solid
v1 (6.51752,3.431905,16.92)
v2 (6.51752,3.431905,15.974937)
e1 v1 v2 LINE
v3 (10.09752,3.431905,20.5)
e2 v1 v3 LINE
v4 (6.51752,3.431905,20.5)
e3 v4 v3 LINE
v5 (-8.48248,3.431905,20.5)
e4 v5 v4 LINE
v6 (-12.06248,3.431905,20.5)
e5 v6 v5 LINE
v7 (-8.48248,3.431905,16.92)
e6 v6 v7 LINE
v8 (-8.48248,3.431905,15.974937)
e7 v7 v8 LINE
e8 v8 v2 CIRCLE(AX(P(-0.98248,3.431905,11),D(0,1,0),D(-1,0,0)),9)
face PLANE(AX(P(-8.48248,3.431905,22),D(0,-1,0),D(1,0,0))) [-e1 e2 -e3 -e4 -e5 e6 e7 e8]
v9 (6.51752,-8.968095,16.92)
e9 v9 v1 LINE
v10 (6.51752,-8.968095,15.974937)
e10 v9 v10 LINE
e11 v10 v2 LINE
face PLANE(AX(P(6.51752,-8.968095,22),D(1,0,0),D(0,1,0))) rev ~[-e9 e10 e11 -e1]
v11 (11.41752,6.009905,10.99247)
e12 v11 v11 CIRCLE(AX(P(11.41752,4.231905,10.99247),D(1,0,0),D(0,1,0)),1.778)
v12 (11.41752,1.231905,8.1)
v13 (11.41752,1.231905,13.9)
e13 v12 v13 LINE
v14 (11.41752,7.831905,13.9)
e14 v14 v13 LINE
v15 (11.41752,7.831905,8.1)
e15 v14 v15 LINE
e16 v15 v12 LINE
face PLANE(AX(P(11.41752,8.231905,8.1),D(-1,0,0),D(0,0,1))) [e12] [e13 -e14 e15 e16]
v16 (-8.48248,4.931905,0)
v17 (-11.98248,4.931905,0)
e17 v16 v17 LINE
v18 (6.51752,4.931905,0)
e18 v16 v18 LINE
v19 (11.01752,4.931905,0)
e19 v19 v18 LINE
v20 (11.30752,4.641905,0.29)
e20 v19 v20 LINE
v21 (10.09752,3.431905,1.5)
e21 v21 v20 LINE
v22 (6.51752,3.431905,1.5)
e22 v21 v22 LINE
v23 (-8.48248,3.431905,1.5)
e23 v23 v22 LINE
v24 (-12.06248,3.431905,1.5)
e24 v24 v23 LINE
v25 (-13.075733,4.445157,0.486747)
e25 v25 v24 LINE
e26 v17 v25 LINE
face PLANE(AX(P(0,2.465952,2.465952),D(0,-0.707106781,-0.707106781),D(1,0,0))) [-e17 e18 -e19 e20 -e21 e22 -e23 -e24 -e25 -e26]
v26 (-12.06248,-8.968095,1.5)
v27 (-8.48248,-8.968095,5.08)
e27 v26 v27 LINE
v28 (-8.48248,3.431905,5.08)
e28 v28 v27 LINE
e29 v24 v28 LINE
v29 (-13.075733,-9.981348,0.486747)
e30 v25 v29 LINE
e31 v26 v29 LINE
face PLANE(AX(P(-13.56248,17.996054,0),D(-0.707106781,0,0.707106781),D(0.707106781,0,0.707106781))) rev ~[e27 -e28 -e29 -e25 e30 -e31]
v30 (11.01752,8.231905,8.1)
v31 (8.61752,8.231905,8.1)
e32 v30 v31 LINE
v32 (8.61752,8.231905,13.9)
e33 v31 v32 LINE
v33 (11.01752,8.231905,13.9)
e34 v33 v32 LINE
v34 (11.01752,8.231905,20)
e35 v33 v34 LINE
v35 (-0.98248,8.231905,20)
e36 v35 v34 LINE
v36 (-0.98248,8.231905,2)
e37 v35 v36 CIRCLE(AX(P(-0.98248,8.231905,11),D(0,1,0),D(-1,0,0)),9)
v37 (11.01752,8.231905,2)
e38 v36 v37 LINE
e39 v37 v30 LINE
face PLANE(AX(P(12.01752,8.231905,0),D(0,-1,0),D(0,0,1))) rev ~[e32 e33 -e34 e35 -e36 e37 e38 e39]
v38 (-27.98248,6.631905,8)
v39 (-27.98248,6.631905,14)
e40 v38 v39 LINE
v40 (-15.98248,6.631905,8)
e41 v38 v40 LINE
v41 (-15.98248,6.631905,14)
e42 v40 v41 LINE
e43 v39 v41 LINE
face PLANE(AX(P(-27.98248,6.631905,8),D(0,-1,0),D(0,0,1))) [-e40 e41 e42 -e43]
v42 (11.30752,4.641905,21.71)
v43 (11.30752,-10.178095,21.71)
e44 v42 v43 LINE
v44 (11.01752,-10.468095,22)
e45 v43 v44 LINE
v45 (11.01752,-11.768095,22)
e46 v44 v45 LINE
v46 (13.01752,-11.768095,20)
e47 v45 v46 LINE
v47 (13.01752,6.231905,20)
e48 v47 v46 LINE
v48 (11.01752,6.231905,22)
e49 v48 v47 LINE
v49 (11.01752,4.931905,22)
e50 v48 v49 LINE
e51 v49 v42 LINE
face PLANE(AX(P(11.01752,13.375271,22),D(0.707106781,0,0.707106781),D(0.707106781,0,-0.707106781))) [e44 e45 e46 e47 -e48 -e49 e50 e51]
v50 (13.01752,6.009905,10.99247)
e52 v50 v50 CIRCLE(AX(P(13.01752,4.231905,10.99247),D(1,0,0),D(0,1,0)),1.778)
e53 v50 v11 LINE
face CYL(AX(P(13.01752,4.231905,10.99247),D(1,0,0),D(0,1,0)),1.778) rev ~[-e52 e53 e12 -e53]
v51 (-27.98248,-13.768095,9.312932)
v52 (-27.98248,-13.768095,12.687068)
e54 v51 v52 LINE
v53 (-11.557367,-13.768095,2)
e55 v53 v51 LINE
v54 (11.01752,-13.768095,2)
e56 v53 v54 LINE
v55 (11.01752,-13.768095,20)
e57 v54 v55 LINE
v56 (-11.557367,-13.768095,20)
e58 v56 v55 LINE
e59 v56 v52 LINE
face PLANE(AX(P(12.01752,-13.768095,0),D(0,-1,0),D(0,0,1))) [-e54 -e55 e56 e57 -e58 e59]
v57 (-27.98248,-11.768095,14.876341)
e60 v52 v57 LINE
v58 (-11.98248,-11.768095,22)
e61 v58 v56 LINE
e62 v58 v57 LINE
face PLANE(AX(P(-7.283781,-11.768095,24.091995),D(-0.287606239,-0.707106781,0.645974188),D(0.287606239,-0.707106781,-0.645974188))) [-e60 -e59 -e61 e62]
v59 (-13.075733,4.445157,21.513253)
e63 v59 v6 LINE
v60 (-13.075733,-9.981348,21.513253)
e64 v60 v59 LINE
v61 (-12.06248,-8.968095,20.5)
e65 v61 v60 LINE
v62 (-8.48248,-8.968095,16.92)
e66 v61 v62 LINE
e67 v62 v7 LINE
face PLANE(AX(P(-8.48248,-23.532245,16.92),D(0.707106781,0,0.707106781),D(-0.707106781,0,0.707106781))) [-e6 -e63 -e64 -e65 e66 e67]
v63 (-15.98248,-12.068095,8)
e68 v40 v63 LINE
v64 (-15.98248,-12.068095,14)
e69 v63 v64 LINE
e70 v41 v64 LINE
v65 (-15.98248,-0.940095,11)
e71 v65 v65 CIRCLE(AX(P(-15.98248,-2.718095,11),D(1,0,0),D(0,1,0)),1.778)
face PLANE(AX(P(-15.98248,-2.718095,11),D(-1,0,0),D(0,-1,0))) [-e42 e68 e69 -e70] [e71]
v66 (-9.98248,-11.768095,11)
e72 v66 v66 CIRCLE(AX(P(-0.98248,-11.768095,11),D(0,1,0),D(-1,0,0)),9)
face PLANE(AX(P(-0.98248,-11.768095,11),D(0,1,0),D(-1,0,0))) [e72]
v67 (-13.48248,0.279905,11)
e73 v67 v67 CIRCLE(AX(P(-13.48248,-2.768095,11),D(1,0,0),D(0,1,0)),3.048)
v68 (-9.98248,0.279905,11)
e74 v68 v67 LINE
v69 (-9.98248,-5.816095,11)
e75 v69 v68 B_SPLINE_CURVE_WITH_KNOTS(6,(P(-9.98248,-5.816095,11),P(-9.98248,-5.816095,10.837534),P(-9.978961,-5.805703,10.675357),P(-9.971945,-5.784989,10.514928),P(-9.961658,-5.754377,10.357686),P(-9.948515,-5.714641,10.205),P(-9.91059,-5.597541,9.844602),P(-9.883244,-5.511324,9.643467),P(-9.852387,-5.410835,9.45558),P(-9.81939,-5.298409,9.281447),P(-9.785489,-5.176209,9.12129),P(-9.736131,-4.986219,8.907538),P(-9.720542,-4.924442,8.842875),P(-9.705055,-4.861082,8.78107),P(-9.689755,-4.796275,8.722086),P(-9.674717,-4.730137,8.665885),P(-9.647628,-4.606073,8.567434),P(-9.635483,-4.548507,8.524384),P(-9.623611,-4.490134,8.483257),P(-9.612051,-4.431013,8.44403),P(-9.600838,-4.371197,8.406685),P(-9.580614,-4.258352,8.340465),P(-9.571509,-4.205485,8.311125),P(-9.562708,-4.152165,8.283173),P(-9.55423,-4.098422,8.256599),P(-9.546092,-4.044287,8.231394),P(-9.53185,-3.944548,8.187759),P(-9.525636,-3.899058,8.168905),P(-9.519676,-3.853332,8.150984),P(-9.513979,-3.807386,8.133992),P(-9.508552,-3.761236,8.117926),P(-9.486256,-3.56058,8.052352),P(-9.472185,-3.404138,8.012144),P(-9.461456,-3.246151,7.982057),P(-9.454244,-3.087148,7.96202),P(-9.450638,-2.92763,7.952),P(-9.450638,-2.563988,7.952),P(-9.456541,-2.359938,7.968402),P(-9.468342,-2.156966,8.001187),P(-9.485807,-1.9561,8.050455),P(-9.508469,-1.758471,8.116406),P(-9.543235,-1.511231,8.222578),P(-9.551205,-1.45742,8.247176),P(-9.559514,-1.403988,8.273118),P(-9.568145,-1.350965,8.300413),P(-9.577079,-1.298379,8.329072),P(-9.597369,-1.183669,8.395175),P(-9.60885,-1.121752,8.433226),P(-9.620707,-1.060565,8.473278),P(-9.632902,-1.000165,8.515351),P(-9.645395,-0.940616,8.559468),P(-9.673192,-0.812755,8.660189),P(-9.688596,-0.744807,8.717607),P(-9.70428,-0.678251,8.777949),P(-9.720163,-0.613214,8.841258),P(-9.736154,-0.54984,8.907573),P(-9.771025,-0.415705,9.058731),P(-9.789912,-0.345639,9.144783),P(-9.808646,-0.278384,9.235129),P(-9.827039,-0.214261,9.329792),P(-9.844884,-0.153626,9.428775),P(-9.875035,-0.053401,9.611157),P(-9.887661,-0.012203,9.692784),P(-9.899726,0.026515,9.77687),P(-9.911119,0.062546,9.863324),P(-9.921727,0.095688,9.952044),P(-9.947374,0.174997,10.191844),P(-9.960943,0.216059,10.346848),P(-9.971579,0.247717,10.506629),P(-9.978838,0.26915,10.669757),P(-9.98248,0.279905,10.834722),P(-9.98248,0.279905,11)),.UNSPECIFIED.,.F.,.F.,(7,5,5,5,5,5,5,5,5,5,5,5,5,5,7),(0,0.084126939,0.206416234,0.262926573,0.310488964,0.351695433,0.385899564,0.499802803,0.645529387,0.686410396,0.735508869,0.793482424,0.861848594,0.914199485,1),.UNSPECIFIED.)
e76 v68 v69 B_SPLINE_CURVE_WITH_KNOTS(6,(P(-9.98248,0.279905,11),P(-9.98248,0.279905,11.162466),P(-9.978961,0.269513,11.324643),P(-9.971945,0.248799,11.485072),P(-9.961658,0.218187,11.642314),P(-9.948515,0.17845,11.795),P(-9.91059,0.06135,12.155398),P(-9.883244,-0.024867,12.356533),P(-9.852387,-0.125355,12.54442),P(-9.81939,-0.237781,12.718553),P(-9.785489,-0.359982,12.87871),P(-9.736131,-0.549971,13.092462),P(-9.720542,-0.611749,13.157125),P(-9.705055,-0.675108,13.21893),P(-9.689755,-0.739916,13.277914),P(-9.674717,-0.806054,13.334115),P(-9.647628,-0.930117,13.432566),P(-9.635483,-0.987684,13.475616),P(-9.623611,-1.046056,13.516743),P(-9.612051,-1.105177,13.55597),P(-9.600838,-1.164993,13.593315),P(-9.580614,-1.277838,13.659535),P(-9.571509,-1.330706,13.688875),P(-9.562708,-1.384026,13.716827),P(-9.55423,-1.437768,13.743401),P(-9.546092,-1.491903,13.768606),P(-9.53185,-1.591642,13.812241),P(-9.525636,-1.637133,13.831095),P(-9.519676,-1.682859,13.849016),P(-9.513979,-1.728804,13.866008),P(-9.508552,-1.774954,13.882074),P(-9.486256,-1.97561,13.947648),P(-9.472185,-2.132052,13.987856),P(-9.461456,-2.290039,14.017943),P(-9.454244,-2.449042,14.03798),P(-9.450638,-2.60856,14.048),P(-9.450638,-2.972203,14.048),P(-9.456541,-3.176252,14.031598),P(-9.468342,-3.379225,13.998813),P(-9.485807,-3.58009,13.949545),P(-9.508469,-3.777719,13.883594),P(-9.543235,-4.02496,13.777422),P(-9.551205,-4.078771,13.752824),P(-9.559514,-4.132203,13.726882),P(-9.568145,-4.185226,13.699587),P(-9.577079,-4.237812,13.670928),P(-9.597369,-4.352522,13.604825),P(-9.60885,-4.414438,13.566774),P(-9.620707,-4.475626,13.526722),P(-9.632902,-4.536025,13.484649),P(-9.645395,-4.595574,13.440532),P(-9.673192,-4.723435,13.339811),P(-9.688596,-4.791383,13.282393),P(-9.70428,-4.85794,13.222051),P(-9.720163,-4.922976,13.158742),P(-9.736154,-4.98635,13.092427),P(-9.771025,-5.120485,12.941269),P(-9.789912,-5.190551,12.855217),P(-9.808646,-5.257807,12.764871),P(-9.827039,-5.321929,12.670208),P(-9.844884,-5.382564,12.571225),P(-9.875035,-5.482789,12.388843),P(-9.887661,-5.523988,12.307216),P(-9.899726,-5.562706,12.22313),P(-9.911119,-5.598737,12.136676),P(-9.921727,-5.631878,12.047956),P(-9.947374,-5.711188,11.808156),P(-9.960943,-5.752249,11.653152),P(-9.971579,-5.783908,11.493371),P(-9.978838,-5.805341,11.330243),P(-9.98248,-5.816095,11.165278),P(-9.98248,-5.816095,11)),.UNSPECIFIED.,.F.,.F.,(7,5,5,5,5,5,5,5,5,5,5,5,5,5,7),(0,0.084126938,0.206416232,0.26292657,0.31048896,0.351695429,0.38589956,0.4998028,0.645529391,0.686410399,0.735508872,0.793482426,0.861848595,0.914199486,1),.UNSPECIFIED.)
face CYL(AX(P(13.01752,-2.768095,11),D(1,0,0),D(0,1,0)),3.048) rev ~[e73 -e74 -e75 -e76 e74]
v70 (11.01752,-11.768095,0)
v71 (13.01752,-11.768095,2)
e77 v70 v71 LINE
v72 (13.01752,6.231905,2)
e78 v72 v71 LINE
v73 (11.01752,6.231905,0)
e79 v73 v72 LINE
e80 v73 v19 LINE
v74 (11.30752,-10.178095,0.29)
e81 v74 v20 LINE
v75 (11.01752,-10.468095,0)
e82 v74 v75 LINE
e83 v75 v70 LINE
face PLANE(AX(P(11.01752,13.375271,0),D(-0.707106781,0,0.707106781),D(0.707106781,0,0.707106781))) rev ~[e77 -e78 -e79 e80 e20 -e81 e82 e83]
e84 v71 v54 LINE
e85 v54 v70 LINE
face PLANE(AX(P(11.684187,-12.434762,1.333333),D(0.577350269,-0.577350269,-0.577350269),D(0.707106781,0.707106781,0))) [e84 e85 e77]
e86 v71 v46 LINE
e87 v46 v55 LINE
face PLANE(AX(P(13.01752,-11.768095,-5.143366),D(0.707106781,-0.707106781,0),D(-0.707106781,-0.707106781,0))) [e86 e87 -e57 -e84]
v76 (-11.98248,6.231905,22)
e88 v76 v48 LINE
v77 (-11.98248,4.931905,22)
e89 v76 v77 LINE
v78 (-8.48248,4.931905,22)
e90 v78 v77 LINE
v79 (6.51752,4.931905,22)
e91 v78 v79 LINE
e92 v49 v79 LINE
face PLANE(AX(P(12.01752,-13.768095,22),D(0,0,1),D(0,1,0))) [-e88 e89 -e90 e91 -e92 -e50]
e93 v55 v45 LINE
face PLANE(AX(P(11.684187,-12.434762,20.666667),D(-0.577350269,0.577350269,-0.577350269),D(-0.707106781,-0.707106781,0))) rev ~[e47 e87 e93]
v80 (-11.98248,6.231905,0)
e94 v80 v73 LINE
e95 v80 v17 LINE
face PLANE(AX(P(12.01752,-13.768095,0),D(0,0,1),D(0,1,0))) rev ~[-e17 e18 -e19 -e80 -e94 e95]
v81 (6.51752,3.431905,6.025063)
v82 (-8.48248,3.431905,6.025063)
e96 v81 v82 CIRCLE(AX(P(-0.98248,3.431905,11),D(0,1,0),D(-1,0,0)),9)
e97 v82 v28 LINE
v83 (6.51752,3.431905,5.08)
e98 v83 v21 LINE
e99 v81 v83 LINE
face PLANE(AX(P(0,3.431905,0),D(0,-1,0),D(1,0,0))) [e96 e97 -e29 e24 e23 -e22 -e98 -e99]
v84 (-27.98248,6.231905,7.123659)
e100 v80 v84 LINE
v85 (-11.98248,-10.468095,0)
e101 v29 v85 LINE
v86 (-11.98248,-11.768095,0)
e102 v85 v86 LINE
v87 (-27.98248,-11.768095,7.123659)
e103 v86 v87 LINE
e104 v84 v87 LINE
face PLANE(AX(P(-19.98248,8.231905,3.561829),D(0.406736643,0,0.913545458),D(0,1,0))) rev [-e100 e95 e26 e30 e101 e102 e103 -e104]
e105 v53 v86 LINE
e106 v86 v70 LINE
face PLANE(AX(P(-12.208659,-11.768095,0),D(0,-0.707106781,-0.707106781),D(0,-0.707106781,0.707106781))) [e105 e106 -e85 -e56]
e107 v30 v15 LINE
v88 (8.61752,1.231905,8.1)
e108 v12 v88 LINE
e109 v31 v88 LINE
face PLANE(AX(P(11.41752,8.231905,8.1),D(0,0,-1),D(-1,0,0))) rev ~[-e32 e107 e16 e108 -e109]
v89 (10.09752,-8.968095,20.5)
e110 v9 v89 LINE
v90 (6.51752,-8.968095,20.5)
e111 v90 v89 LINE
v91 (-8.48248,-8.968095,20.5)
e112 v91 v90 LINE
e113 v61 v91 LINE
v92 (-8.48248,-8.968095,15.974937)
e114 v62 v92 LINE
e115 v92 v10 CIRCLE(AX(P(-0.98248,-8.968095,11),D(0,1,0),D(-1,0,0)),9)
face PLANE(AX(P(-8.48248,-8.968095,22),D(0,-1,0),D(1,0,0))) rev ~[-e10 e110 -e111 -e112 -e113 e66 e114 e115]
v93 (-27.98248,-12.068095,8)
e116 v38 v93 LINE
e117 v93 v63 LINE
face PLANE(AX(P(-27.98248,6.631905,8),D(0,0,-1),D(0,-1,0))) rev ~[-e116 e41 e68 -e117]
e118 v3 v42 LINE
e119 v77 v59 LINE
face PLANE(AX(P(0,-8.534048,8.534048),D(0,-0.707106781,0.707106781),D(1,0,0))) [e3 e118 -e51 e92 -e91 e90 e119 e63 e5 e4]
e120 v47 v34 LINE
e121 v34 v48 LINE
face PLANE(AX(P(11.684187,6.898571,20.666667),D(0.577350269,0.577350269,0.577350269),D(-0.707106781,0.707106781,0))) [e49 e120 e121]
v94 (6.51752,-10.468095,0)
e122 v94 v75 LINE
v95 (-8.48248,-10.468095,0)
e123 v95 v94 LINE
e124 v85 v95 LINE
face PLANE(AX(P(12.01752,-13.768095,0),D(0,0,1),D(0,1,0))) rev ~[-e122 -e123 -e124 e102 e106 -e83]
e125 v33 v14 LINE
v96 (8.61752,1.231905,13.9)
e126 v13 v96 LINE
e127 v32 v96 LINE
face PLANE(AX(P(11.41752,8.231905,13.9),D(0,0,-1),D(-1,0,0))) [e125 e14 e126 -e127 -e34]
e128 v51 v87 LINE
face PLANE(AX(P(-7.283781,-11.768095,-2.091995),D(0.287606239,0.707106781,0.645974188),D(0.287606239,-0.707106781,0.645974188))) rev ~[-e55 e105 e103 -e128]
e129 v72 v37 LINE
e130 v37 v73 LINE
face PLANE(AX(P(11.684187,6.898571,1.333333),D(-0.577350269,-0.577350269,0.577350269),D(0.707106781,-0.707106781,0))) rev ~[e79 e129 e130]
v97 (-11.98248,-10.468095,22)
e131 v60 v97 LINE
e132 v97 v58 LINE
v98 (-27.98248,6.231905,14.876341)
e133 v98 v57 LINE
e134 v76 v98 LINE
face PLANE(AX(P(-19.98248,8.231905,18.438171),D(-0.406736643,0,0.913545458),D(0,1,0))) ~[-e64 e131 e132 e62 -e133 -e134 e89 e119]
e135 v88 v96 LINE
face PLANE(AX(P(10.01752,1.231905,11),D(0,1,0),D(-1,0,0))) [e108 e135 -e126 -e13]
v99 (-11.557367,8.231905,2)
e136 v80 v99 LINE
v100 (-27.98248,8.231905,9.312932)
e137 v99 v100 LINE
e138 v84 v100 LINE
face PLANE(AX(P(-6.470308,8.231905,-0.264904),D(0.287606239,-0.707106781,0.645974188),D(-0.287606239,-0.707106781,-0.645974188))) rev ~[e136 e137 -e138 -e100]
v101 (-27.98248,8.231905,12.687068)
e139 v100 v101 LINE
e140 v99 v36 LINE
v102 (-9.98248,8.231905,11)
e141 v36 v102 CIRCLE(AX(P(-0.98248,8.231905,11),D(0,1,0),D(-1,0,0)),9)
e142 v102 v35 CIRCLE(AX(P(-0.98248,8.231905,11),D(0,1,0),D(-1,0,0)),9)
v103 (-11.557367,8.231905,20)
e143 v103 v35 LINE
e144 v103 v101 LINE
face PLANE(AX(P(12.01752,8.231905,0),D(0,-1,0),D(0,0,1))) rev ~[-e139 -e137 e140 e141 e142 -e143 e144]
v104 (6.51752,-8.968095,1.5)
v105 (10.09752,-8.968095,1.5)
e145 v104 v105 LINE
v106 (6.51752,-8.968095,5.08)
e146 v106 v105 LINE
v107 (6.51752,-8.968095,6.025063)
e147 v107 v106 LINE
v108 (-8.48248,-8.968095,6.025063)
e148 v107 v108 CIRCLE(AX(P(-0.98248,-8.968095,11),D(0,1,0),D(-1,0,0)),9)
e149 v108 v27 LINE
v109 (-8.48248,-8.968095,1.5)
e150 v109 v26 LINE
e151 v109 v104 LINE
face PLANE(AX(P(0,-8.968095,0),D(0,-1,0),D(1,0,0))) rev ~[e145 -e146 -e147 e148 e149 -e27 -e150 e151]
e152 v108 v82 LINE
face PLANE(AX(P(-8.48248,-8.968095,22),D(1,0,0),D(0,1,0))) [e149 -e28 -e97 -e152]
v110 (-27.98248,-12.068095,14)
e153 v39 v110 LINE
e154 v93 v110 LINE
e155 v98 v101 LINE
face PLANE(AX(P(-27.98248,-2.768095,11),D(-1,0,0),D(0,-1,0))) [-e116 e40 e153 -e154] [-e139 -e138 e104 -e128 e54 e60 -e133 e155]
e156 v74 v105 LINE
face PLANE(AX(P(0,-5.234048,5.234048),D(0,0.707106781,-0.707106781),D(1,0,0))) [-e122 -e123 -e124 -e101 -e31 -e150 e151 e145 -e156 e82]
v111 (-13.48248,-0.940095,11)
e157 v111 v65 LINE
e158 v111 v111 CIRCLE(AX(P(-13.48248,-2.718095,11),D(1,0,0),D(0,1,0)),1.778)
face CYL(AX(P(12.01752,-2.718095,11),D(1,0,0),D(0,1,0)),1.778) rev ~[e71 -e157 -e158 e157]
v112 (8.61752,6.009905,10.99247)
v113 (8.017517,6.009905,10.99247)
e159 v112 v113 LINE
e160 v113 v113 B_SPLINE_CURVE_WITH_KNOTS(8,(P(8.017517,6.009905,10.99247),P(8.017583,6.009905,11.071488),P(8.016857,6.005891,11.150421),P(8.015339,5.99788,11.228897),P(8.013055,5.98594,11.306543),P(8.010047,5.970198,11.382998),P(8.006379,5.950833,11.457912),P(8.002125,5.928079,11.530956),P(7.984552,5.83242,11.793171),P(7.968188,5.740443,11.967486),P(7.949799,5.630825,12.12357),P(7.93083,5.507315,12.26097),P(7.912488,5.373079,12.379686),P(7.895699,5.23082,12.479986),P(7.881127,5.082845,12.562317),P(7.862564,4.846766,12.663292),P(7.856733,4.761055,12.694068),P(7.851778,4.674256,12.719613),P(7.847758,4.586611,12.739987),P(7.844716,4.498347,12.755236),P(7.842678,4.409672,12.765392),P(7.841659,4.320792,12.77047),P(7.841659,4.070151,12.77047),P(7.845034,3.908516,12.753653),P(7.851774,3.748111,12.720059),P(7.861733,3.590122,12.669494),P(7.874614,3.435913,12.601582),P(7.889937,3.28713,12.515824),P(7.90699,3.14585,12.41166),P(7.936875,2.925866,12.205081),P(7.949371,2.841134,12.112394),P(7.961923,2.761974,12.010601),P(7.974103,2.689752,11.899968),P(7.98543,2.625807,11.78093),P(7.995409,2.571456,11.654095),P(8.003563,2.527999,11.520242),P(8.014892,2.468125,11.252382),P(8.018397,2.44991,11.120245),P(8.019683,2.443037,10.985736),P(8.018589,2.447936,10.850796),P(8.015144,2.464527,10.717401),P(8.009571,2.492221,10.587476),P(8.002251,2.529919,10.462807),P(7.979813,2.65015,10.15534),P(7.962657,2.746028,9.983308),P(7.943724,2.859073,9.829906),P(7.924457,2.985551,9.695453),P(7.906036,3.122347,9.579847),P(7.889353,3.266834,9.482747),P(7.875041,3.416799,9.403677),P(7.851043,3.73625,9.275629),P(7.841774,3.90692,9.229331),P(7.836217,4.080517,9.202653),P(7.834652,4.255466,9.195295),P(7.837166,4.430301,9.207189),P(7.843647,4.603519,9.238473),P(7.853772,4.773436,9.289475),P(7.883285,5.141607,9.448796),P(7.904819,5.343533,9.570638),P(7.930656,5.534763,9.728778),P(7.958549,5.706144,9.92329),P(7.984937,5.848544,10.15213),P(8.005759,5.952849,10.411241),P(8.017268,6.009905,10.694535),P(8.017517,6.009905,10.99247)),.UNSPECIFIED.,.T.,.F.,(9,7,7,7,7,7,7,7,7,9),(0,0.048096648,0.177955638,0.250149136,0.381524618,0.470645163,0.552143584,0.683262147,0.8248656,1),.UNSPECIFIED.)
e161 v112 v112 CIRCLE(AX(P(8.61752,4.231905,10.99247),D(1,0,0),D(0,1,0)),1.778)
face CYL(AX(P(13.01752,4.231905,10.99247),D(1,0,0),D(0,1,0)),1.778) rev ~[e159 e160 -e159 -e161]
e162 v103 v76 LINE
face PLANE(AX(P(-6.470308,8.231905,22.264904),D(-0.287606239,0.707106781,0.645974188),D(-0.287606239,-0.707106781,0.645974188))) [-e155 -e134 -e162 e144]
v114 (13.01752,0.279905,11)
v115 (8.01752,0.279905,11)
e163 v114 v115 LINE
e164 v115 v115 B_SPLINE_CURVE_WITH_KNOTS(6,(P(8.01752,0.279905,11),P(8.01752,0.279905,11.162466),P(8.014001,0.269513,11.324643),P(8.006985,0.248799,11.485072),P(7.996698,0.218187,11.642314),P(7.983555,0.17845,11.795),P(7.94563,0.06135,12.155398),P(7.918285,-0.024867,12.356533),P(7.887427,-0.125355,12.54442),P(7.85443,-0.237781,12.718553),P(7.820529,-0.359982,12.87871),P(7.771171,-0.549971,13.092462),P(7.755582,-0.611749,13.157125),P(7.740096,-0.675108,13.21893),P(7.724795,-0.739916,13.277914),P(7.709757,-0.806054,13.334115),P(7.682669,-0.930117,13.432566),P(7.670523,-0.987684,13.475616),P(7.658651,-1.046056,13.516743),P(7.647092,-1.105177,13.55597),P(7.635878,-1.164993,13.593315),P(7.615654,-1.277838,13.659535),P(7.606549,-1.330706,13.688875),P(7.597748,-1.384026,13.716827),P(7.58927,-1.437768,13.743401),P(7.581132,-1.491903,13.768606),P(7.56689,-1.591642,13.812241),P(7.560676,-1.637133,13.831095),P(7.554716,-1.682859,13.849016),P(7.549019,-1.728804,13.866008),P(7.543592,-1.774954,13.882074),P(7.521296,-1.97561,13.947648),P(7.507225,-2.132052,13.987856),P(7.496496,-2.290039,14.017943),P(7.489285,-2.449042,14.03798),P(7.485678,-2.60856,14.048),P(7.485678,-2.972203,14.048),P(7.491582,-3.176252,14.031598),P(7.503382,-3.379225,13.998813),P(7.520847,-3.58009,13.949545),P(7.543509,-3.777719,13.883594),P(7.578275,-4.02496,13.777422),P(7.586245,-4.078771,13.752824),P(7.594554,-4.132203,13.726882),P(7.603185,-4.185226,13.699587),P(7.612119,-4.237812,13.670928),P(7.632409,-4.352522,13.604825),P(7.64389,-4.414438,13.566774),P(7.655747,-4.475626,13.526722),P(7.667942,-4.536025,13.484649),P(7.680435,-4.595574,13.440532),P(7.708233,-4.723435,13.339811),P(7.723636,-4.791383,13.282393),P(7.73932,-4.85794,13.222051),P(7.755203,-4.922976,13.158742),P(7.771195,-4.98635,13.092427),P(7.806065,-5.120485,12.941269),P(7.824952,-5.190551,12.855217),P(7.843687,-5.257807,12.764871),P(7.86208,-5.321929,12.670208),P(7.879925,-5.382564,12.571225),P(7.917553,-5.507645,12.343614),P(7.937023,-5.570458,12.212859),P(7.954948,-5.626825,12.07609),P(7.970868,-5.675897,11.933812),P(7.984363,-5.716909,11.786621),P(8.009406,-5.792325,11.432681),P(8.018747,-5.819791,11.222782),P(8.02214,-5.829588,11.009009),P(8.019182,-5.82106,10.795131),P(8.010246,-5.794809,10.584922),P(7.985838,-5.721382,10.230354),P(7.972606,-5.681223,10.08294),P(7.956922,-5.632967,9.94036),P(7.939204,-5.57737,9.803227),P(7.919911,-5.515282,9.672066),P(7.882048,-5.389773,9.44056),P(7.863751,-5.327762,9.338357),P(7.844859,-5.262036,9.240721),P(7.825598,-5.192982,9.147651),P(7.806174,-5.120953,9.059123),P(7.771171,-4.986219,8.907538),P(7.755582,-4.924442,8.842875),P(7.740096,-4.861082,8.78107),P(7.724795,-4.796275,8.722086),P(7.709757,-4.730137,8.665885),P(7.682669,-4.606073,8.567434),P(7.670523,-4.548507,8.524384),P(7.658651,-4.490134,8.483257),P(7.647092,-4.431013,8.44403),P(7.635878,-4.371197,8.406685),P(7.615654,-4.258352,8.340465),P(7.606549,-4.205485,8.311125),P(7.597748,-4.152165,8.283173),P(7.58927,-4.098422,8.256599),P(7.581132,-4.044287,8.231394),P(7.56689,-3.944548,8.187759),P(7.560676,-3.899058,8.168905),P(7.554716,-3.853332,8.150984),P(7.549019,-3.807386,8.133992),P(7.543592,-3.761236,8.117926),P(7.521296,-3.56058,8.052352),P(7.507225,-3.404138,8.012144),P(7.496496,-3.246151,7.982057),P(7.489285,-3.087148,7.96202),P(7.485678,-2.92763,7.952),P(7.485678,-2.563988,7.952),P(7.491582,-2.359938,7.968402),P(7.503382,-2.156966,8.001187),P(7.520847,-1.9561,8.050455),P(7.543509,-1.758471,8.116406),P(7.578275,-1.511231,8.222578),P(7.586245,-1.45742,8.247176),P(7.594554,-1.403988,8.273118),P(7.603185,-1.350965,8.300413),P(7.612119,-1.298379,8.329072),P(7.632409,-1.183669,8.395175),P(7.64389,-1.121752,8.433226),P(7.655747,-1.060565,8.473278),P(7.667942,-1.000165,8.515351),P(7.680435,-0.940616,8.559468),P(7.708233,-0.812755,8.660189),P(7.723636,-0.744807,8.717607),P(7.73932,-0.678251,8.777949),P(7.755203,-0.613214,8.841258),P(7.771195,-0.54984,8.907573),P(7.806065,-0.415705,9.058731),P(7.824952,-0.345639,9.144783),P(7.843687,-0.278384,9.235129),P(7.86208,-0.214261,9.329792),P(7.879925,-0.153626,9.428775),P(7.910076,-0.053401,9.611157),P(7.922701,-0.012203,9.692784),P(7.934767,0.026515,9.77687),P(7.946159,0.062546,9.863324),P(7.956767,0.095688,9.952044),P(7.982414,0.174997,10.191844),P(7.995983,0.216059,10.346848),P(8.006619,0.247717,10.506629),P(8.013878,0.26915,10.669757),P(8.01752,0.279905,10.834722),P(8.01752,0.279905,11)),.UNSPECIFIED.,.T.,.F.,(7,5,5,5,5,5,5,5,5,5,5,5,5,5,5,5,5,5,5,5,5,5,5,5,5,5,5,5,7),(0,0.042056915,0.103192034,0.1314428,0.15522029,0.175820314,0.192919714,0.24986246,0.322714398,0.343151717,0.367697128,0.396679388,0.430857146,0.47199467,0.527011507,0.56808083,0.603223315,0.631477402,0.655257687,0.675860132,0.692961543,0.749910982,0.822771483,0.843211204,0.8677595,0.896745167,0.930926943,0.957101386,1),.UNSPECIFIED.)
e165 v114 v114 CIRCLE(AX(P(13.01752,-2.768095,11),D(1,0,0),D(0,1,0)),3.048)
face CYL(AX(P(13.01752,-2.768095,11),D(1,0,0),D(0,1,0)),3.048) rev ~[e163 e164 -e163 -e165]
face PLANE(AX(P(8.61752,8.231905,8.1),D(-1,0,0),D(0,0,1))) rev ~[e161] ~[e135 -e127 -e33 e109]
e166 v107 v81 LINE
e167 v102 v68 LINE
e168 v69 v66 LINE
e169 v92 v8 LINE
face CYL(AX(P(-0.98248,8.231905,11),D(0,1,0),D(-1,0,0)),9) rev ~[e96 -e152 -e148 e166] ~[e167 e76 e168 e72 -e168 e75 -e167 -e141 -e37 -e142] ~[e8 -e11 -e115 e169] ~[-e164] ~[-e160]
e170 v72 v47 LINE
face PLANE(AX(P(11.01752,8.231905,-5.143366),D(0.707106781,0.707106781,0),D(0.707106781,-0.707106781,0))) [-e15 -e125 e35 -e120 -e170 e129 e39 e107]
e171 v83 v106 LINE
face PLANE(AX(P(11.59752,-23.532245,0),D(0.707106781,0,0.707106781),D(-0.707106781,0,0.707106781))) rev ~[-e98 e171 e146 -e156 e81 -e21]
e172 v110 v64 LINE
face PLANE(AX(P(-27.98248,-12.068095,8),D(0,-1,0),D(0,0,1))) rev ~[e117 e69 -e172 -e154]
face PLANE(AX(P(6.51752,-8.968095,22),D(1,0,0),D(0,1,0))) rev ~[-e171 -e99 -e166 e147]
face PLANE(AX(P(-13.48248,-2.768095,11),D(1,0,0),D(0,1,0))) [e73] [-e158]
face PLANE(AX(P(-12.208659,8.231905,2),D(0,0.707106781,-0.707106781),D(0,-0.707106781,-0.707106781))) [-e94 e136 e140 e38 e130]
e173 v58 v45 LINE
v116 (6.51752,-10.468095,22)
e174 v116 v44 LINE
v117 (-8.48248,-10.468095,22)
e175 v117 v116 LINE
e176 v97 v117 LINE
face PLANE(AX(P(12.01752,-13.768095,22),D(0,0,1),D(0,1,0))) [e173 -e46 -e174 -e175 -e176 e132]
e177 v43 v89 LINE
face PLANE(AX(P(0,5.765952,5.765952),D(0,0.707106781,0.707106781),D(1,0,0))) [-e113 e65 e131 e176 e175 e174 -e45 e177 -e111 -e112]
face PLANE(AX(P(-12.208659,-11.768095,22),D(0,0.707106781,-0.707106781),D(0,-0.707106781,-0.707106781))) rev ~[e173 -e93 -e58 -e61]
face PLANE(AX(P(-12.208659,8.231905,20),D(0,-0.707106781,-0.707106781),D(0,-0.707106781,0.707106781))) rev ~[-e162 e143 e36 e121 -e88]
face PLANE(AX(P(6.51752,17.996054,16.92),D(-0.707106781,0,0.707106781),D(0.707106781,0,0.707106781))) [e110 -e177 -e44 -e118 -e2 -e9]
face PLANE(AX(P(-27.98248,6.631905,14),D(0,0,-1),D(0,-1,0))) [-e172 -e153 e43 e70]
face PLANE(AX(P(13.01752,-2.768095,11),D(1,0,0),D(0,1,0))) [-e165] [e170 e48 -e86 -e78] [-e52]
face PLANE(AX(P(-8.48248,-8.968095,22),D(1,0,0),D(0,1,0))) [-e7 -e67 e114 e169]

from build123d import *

# Parameters (mm, degrees)
F0_W          = 26
F0_H          = 22
F1_DEPTH      = 22
F2_R          = 9
F3_DEPTH      = 20
F4_W          = 15
F4_H          = 12.4
F5_DEPTH      = 22.001
F6_W          = 22
F6_H          = 22
F7_DEPTH      = 14
F8_W          = 18.7
F8_H          = 6
F9_DEPTH      = 12
F10_R         = 1.778
F11_DEPTH     = 40.001
F12_SIZE      = 1.5
F13_SIZE2     = 7.1236589649
F13_SIZE      = 16
F13_2_SIZE2   = 7.1236589649
F13_2_SIZE    = 16
F14_T1_DEPTH  = 27.800912408
F14_T3_DEPTH  = 27.800912408
F15_W         = 2.8
F15_H         = 5.8
F16_DEPTH     = 7
F17_W         = 22
F17_H         = 22
F18_DEPTH     = 1
F19_R         = 3.048
F20_DEPTH     = 26.5
F21_R         = 1.778
F22_DEPTH     = 6
F23_T1_DEPTH  = 2.5403411844
F23_T3_DEPTH  = 2.5403411844
F23_T5_DEPTH  = 2.5403411844
F23_T7_DEPTH  = 2.5403411844
F23_T9_DEPTH  = 32.2867319519
F23_T11_DEPTH = 32.2867319519
F23_T13_DEPTH = 30.3695452806
F24_T4_DEPTH  = 41.5282991577
F24_T10_DEPTH = 41.5282991577
F24_T16_DEPTH = 41.5282991577
F24_T22_DEPTH = 41.5282991577
F24_T28_DEPTH = 41.5282991577
F24_T34_DEPTH = 41.5282991577
F24_T40_DEPTH = 41.5282991577
F24_T46_DEPTH = 41.5282991577


# Not quite as in the source:
# - a fillet or chamfer that OpenCascade refuses, or shapes differently, is made with other operations: its cross-section is extruded or revolved along the edge and cut away or added


with BuildPart() as f1:
    # F0 (on Top) → F1 (new body)
    with BuildSketch(Plane.XY):
        with Locations((-0.9824799188, -2.7680952549)):
            Rectangle(F0_W, F0_H)
    extrude(amount=F1_DEPTH)

    # F2 (on face) → F3 (cut)
    with BuildSketch(Plane(origin=(0, 8.2319047451, 0), x_dir=(-1, 0, 0), z_dir=(0, 1, 0))):
        with Locations((0.9824799188, 11)):
            Circle(F2_R)
    extrude(amount=-F3_DEPTH, mode=Mode.SUBTRACT)

    # F4 (on face) → F5 (cut, through all)
    with BuildSketch(Plane.XY.offset(22)):
        with Locations((-0.9824799188, -2.7680952549)):
            Rectangle(F4_W, F4_H)
    extrude(amount=-F5_DEPTH, mode=Mode.SUBTRACT)

    # F6 (on face) → F7 (join)
    with BuildSketch(Plane(origin=(-13.9824799188, 0, 0), x_dir=(0, -1, 0), z_dir=(-1, 0, 0))):
        with Locations((2.7680952549, 11)):
            Rectangle(F6_W, F6_H)
    extrude(amount=F7_DEPTH)

    # F8 (on face) → F9 (cut)
    with BuildSketch(Plane(origin=(-27.9824799188, 0, 0), x_dir=(0, -1, 0), z_dir=(-1, 0, 0))):
        with Locations((2.7180952549, 11)):
            Rectangle(F8_W, F8_H)
    extrude(amount=-F9_DEPTH, mode=Mode.SUBTRACT)

    # F10 (on face) → F11 (cut, through all)
    with BuildSketch(Plane.YZ.offset(12.0175200812)):
        with Locations((-2.7180952549, 11)):
            Circle(F10_R)
    extrude(amount=-F11_DEPTH, mode=Mode.SUBTRACT)

    # F12
    f12_edges = [f1.edges().sort_by_distance(p)[0] for p in [
        (-0.98248, 3.431905, 22),
        (-0.98248, -8.968095, 22),
        (-0.98248, 3.431905, 0),
        (-0.98248, -8.968095, 0),
    ]]
    chamfer(f12_edges, length=F12_SIZE)

    # F13
    f13_edges = [f1.edges().sort_by_distance(p)[0] for p in [
        (-27.98248, -2.768095, 22),
    ]]
    f13_side = f1.faces().sort_by_distance((-10.474005, -2.768095, 22))[0]
    chamfer(f13_edges, length=F13_SIZE, length2=F13_SIZE2, reference=f13_side)

    # F13#2
    f13_2_edges = [f1.edges().sort_by_distance(p)[0] for p in [
        (-27.98248, -2.768095, 0),
    ]]
    f13_2_side = f1.faces().sort_by_distance((-10.474005, -2.768095, 0))[0]
    chamfer(f13_2_edges, length=F13_2_SIZE, length2=F13_2_SIZE2, reference=f13_2_side)

    # F14: chamfer of 2 on 4 edges, made by hand

    # F14_s2 → F14_t1 (cut)
    with BuildSketch(Plane(origin=(2.8731297183, 0, 1.2791997672), x_dir=(0, 1, 0), z_dir=(-0.9135454576, 0, -0.4067366431))):
        Polygon((8.2319047451, -22.971713726), (6.2319047451, -24.971713726), (8.2319047451, -24.971713726), align=None)
        Polygon((-11.7680952549, -24.971713726), (-13.7680952549, -22.971713726), (-13.7680952549, -24.971713726), align=None)
    extrude(amount=F14_T1_DEPTH, mode=Mode.SUBTRACT)

    # F14_s4 → F14_t3 (cut)
    with BuildSketch(Plane(origin=(-5.301463362, 0, 2.3603635629), x_dir=(0, 1, 0), z_dir=(-0.9135454576, 0, 0.4067366431))):
        Polygon((8.2319047451, 2.8737136579), (6.2319047451, 4.8737136579), (8.2319047451, 4.8737136579), align=None)
        Polygon((-11.7680952549, 4.8737136579), (-13.7680952549, 2.8737136579), (-13.7680952549, 4.8737136579), align=None)
    extrude(amount=F14_T3_DEPTH, mode=Mode.SUBTRACT)

    # F15 (on face) → F16 (cut)
    with BuildSketch(Plane(origin=(0, 8.2319047451, 0), x_dir=(-1, 0, 0), z_dir=(0, 1, 0))):
        with Locations((-10.0175200812, 11)):
            Rectangle(F15_W, F15_H)
    extrude(amount=-F16_DEPTH, mode=Mode.SUBTRACT)

    # F17 (on face) → F18 (join)
    with BuildSketch(Plane.YZ.offset(12.0175200812)):
        with Locations((-2.7680952549, 11)):
            Rectangle(F17_W, F17_H)
    extrude(amount=F18_DEPTH)

    # F19 (on face) → F20 (cut)
    with BuildSketch(Plane.YZ.offset(13.0175200812)):
        with Locations((-2.7680952549, 11)):
            Circle(F19_R)
    extrude(amount=-F20_DEPTH, mode=Mode.SUBTRACT)

    # F21 (on face) → F22 (cut)
    with BuildSketch(Plane.YZ.offset(13.0175200812)):
        with Locations((4.2319047451, 10.9924701974)):
            Circle(F21_R)
    extrude(amount=-F22_DEPTH, mode=Mode.SUBTRACT)

    # F23: chamfer of 2 on 8 edges, made by hand

    # F23_s2 → F23_t1 (cut)
    with BuildSketch(Plane(origin=(7.595205112, -7.595205112, -7.595205112), x_dir=(0.7071067812, 0.7071067812, 0), z_dir=(0.5773502692, -0.5773502692, -0.5773502692))):
        Polygon((-0.5307367951, 9.3021885081), (0.8834767672, 11.7516782509), (-1.9449503575, 11.7516782509), align=None)
    extrude(amount=F23_T1_DEPTH, mode=Mode.SUBTRACT)

    # F23_s4 → F23_t3 (cut)
    with BuildSketch(Plane(origin=(5.7498082754, 5.7498082754, -5.7498082754), x_dir=(-0.7071067812, 0.7071067812, 0), z_dir=(0.5773502692, 0.5773502692, -0.5773502692))):
        Polygon((-1.9697274939, 9.4915379396), (-3.3839410563, 7.0420481968), (-4.7981546187, 9.4915379396), align=None)
    extrude(amount=F23_T3_DEPTH, mode=Mode.SUBTRACT)

    # F23_s6 → F23_t5 (cut)
    with BuildSketch(Plane(origin=(13.0831416088, 13.0831416088, 13.0831416088), x_dir=(-0.7071067812, 0.7071067812, 0), z_dir=(0.5773502692, 0.5773502692, 0.5773502692))):
        Polygon((-1.9697274939, 8.4713868408), (-3.3839410563, 10.9208765836), (-4.7981546187, 8.4713868408), align=None)
    extrude(amount=F23_T5_DEPTH, mode=Mode.SUBTRACT)

    # F23_s8 → F23_t7 (cut)
    with BuildSketch(Plane(origin=(14.9285384454, -14.9285384454, 14.9285384454), x_dir=(0.7071067812, 0.7071067812, 0), z_dir=(0.5773502692, -0.5773502692, 0.5773502692))):
        Polygon((-0.5307367951, 8.6607362723), (0.8834767672, 6.2112465295), (-1.9449503575, 6.2112465295), align=None)
    extrude(amount=F23_T7_DEPTH, mode=Mode.SUBTRACT)

    # F23_s10 → F23_t9 (cut)
    with BuildSketch(Plane.XZ.offset(-13.375270721)):
        Polygon((11.0175200812, 0), (13.0175200812, 2), (13.0175200812, 0), align=None)
        Polygon((11.0175200812, 22), (13.0175200812, 20), (13.0175200812, 22), align=None)
    extrude(amount=F23_T9_DEPTH, mode=Mode.SUBTRACT)

    # F23_s12 → F23_t11 (cut)
    with BuildSketch(Plane.XY.offset(-5.1433659759)):
        Polygon((11.0175200812, 8.2319047451), (13.0175200812, 6.2319047451), (13.0175200812, 8.2319047451), align=None)
        Polygon((13.0175200812, -11.7680952549), (11.0175200812, -13.7680952549), (13.0175200812, -13.7680952549), align=None)
    extrude(amount=F23_T11_DEPTH, mode=Mode.SUBTRACT)

    # F23_s14 → F23_t13 (cut)
    with BuildSketch(Plane.YZ.offset(-12.2086592235)):
        Polygon((8.2319047451, 20), (6.2319047451, 22), (8.2319047451, 22), align=None)
        Polygon((-11.7680952549, 22), (-13.7680952549, 20), (-13.7680952549, 22), align=None)
        Polygon((-11.7680952549, 0), (-13.7680952549, 2), (-13.7680952549, 0), align=None)
        Polygon((8.2319047451, 2), (6.2319047451, 0), (8.2319047451, 0), align=None)
    extrude(amount=F23_T13_DEPTH, mode=Mode.SUBTRACT)

    # F24: chamfer of 5.08 on 4 edges, made by hand


with BuildPart() as f24_tool2:
    # F24_s3 → F24_t4 (new body)
    with BuildSketch(Plane.XZ.offset(23.5322448338)):
        Polygon((-8.4824799188, 16.92), (-13.5624799188, 22), (-8.4824799188, 22), align=None)
    extrude(amount=-F24_T4_DEPTH)

    split(bisect_by=Plane(origin=(0, 5.7659523726, 5.7659523726), x_dir=(1, 0, 0), z_dir=(0, 0.7071067812, 0.7071067812)), keep=Keep.TOP)

    split(bisect_by=Plane(origin=(0, -8.5340476274, 8.5340476274), x_dir=(1, 0, 0), z_dir=(0, -0.7071067812, 0.7071067812)), keep=Keep.TOP)


with BuildPart() as f1_1:
    add(f1.part)

    # F24_t1: cut F24_tool2
    add(f24_tool2.part, mode=Mode.SUBTRACT)


with BuildPart() as f24_tool8:
    # F24_s9 → F24_t10 (new body)
    with BuildSketch(Plane.XZ.offset(23.5322448338)):
        Polygon((-8.4824799188, 16.92), (-13.5624799188, 22), (-8.4824799188, 22), align=None)
    extrude(amount=-F24_T10_DEPTH)

    split(bisect_by=Plane.XZ.offset(8.9680952549), keep=Keep.BOTTOM)

    split(bisect_by=Plane.XZ.offset(-3.4319047451), keep=Keep.TOP)


with BuildPart() as f1_2:
    add(f1_1.part)

    # F24_t7: cut F24_tool8
    add(f24_tool8.part, mode=Mode.SUBTRACT)


with BuildPart() as f24_tool14:
    # F24_s15 → F24_t16 (new body)
    with BuildSketch(Plane.XZ.offset(-17.996054324)):
        Polygon((6.5175200812, 16.92), (11.5975200812, 22), (6.5175200812, 22), align=None)
    extrude(amount=F24_T16_DEPTH)

    split(bisect_by=Plane(origin=(0, 5.7659523726, 5.7659523726), x_dir=(1, 0, 0), z_dir=(0, 0.7071067812, 0.7071067812)), keep=Keep.TOP)

    split(bisect_by=Plane(origin=(0, -8.5340476274, 8.5340476274), x_dir=(1, 0, 0), z_dir=(0, -0.7071067812, 0.7071067812)), keep=Keep.TOP)


with BuildPart() as f1_3:
    add(f1_2.part)

    # F24_t13: cut F24_tool14
    add(f24_tool14.part, mode=Mode.SUBTRACT)


with BuildPart() as f24_tool20:
    # F24_s21 → F24_t22 (new body)
    with BuildSketch(Plane.XZ.offset(-17.996054324)):
        Polygon((6.5175200812, 16.92), (11.5975200812, 22), (6.5175200812, 22), align=None)
    extrude(amount=F24_T22_DEPTH)

    split(bisect_by=Plane.XZ.offset(8.9680952549), keep=Keep.BOTTOM)

    split(bisect_by=Plane.XZ.offset(-3.4319047451), keep=Keep.TOP)


with BuildPart() as f1_4:
    add(f1_3.part)

    # F24_t19: cut F24_tool20
    add(f24_tool20.part, mode=Mode.SUBTRACT)


with BuildPart() as f24_tool26:
    # F24_s27 → F24_t28 (new body)
    with BuildSketch(Plane.XZ.offset(23.5322448338)):
        Polygon((11.5975200812, 0), (6.5175200812, 5.08), (6.5175200812, 0), align=None)
    extrude(amount=-F24_T28_DEPTH)

    split(bisect_by=Plane.XZ.offset(8.9680952549), keep=Keep.BOTTOM)

    split(bisect_by=Plane(origin=(0, 2.4659523726, 2.4659523726), x_dir=(1, 0, 0), z_dir=(0, -0.7071067812, -0.7071067812)), keep=Keep.TOP)


with BuildPart() as f1_5:
    add(f1_4.part)

    # F24_t25: cut F24_tool26
    add(f24_tool26.part, mode=Mode.SUBTRACT)


with BuildPart() as f24_tool32:
    # F24_s33 → F24_t34 (new body)
    with BuildSketch(Plane.XZ.offset(23.5322448338)):
        Polygon((11.5975200812, 0), (6.5175200812, 5.08), (6.5175200812, 0), align=None)
    extrude(amount=-F24_T34_DEPTH)

    split(bisect_by=Plane.XZ.offset(-3.4319047451), keep=Keep.TOP)

    split(bisect_by=Plane(origin=(0, -5.2340476274, 5.2340476274), x_dir=(1, 0, 0), z_dir=(0, 0.7071067812, -0.7071067812)), keep=Keep.TOP)


with BuildPart() as f1_6:
    add(f1_5.part)

    # F24_t31: cut F24_tool32
    add(f24_tool32.part, mode=Mode.SUBTRACT)


with BuildPart() as f24_tool38:
    # F24_s39 → F24_t40 (new body)
    with BuildSketch(Plane.XZ.offset(-17.996054324)):
        Polygon((-13.5624799188, 0), (-8.4824799188, 5.08), (-8.4824799188, 0), align=None)
    extrude(amount=F24_T40_DEPTH)

    split(bisect_by=Plane.XZ.offset(-3.4319047451), keep=Keep.TOP)

    split(bisect_by=Plane(origin=(0, -5.2340476274, 5.2340476274), x_dir=(1, 0, 0), z_dir=(0, 0.7071067812, -0.7071067812)), keep=Keep.TOP)


with BuildPart() as f1_7:
    add(f1_6.part)

    # F24_t37: cut F24_tool38
    add(f24_tool38.part, mode=Mode.SUBTRACT)


with BuildPart() as f24_tool44:
    # F24_s45 → F24_t46 (new body)
    with BuildSketch(Plane.XZ.offset(-17.996054324)):
        Polygon((-13.5624799188, 0), (-8.4824799188, 5.08), (-8.4824799188, 0), align=None)
    extrude(amount=F24_T46_DEPTH)

    split(bisect_by=Plane.XZ.offset(8.9680952549), keep=Keep.BOTTOM)

    split(bisect_by=Plane(origin=(0, 2.4659523726, 2.4659523726), x_dir=(1, 0, 0), z_dir=(0, -0.7071067812, -0.7071067812)), keep=Keep.TOP)


with BuildPart() as f1_8:
    add(f1_7.part)

    # F24_t43: cut F24_tool44
    add(f24_tool44.part, mode=Mode.SUBTRACT)


solid = f1_8.part
